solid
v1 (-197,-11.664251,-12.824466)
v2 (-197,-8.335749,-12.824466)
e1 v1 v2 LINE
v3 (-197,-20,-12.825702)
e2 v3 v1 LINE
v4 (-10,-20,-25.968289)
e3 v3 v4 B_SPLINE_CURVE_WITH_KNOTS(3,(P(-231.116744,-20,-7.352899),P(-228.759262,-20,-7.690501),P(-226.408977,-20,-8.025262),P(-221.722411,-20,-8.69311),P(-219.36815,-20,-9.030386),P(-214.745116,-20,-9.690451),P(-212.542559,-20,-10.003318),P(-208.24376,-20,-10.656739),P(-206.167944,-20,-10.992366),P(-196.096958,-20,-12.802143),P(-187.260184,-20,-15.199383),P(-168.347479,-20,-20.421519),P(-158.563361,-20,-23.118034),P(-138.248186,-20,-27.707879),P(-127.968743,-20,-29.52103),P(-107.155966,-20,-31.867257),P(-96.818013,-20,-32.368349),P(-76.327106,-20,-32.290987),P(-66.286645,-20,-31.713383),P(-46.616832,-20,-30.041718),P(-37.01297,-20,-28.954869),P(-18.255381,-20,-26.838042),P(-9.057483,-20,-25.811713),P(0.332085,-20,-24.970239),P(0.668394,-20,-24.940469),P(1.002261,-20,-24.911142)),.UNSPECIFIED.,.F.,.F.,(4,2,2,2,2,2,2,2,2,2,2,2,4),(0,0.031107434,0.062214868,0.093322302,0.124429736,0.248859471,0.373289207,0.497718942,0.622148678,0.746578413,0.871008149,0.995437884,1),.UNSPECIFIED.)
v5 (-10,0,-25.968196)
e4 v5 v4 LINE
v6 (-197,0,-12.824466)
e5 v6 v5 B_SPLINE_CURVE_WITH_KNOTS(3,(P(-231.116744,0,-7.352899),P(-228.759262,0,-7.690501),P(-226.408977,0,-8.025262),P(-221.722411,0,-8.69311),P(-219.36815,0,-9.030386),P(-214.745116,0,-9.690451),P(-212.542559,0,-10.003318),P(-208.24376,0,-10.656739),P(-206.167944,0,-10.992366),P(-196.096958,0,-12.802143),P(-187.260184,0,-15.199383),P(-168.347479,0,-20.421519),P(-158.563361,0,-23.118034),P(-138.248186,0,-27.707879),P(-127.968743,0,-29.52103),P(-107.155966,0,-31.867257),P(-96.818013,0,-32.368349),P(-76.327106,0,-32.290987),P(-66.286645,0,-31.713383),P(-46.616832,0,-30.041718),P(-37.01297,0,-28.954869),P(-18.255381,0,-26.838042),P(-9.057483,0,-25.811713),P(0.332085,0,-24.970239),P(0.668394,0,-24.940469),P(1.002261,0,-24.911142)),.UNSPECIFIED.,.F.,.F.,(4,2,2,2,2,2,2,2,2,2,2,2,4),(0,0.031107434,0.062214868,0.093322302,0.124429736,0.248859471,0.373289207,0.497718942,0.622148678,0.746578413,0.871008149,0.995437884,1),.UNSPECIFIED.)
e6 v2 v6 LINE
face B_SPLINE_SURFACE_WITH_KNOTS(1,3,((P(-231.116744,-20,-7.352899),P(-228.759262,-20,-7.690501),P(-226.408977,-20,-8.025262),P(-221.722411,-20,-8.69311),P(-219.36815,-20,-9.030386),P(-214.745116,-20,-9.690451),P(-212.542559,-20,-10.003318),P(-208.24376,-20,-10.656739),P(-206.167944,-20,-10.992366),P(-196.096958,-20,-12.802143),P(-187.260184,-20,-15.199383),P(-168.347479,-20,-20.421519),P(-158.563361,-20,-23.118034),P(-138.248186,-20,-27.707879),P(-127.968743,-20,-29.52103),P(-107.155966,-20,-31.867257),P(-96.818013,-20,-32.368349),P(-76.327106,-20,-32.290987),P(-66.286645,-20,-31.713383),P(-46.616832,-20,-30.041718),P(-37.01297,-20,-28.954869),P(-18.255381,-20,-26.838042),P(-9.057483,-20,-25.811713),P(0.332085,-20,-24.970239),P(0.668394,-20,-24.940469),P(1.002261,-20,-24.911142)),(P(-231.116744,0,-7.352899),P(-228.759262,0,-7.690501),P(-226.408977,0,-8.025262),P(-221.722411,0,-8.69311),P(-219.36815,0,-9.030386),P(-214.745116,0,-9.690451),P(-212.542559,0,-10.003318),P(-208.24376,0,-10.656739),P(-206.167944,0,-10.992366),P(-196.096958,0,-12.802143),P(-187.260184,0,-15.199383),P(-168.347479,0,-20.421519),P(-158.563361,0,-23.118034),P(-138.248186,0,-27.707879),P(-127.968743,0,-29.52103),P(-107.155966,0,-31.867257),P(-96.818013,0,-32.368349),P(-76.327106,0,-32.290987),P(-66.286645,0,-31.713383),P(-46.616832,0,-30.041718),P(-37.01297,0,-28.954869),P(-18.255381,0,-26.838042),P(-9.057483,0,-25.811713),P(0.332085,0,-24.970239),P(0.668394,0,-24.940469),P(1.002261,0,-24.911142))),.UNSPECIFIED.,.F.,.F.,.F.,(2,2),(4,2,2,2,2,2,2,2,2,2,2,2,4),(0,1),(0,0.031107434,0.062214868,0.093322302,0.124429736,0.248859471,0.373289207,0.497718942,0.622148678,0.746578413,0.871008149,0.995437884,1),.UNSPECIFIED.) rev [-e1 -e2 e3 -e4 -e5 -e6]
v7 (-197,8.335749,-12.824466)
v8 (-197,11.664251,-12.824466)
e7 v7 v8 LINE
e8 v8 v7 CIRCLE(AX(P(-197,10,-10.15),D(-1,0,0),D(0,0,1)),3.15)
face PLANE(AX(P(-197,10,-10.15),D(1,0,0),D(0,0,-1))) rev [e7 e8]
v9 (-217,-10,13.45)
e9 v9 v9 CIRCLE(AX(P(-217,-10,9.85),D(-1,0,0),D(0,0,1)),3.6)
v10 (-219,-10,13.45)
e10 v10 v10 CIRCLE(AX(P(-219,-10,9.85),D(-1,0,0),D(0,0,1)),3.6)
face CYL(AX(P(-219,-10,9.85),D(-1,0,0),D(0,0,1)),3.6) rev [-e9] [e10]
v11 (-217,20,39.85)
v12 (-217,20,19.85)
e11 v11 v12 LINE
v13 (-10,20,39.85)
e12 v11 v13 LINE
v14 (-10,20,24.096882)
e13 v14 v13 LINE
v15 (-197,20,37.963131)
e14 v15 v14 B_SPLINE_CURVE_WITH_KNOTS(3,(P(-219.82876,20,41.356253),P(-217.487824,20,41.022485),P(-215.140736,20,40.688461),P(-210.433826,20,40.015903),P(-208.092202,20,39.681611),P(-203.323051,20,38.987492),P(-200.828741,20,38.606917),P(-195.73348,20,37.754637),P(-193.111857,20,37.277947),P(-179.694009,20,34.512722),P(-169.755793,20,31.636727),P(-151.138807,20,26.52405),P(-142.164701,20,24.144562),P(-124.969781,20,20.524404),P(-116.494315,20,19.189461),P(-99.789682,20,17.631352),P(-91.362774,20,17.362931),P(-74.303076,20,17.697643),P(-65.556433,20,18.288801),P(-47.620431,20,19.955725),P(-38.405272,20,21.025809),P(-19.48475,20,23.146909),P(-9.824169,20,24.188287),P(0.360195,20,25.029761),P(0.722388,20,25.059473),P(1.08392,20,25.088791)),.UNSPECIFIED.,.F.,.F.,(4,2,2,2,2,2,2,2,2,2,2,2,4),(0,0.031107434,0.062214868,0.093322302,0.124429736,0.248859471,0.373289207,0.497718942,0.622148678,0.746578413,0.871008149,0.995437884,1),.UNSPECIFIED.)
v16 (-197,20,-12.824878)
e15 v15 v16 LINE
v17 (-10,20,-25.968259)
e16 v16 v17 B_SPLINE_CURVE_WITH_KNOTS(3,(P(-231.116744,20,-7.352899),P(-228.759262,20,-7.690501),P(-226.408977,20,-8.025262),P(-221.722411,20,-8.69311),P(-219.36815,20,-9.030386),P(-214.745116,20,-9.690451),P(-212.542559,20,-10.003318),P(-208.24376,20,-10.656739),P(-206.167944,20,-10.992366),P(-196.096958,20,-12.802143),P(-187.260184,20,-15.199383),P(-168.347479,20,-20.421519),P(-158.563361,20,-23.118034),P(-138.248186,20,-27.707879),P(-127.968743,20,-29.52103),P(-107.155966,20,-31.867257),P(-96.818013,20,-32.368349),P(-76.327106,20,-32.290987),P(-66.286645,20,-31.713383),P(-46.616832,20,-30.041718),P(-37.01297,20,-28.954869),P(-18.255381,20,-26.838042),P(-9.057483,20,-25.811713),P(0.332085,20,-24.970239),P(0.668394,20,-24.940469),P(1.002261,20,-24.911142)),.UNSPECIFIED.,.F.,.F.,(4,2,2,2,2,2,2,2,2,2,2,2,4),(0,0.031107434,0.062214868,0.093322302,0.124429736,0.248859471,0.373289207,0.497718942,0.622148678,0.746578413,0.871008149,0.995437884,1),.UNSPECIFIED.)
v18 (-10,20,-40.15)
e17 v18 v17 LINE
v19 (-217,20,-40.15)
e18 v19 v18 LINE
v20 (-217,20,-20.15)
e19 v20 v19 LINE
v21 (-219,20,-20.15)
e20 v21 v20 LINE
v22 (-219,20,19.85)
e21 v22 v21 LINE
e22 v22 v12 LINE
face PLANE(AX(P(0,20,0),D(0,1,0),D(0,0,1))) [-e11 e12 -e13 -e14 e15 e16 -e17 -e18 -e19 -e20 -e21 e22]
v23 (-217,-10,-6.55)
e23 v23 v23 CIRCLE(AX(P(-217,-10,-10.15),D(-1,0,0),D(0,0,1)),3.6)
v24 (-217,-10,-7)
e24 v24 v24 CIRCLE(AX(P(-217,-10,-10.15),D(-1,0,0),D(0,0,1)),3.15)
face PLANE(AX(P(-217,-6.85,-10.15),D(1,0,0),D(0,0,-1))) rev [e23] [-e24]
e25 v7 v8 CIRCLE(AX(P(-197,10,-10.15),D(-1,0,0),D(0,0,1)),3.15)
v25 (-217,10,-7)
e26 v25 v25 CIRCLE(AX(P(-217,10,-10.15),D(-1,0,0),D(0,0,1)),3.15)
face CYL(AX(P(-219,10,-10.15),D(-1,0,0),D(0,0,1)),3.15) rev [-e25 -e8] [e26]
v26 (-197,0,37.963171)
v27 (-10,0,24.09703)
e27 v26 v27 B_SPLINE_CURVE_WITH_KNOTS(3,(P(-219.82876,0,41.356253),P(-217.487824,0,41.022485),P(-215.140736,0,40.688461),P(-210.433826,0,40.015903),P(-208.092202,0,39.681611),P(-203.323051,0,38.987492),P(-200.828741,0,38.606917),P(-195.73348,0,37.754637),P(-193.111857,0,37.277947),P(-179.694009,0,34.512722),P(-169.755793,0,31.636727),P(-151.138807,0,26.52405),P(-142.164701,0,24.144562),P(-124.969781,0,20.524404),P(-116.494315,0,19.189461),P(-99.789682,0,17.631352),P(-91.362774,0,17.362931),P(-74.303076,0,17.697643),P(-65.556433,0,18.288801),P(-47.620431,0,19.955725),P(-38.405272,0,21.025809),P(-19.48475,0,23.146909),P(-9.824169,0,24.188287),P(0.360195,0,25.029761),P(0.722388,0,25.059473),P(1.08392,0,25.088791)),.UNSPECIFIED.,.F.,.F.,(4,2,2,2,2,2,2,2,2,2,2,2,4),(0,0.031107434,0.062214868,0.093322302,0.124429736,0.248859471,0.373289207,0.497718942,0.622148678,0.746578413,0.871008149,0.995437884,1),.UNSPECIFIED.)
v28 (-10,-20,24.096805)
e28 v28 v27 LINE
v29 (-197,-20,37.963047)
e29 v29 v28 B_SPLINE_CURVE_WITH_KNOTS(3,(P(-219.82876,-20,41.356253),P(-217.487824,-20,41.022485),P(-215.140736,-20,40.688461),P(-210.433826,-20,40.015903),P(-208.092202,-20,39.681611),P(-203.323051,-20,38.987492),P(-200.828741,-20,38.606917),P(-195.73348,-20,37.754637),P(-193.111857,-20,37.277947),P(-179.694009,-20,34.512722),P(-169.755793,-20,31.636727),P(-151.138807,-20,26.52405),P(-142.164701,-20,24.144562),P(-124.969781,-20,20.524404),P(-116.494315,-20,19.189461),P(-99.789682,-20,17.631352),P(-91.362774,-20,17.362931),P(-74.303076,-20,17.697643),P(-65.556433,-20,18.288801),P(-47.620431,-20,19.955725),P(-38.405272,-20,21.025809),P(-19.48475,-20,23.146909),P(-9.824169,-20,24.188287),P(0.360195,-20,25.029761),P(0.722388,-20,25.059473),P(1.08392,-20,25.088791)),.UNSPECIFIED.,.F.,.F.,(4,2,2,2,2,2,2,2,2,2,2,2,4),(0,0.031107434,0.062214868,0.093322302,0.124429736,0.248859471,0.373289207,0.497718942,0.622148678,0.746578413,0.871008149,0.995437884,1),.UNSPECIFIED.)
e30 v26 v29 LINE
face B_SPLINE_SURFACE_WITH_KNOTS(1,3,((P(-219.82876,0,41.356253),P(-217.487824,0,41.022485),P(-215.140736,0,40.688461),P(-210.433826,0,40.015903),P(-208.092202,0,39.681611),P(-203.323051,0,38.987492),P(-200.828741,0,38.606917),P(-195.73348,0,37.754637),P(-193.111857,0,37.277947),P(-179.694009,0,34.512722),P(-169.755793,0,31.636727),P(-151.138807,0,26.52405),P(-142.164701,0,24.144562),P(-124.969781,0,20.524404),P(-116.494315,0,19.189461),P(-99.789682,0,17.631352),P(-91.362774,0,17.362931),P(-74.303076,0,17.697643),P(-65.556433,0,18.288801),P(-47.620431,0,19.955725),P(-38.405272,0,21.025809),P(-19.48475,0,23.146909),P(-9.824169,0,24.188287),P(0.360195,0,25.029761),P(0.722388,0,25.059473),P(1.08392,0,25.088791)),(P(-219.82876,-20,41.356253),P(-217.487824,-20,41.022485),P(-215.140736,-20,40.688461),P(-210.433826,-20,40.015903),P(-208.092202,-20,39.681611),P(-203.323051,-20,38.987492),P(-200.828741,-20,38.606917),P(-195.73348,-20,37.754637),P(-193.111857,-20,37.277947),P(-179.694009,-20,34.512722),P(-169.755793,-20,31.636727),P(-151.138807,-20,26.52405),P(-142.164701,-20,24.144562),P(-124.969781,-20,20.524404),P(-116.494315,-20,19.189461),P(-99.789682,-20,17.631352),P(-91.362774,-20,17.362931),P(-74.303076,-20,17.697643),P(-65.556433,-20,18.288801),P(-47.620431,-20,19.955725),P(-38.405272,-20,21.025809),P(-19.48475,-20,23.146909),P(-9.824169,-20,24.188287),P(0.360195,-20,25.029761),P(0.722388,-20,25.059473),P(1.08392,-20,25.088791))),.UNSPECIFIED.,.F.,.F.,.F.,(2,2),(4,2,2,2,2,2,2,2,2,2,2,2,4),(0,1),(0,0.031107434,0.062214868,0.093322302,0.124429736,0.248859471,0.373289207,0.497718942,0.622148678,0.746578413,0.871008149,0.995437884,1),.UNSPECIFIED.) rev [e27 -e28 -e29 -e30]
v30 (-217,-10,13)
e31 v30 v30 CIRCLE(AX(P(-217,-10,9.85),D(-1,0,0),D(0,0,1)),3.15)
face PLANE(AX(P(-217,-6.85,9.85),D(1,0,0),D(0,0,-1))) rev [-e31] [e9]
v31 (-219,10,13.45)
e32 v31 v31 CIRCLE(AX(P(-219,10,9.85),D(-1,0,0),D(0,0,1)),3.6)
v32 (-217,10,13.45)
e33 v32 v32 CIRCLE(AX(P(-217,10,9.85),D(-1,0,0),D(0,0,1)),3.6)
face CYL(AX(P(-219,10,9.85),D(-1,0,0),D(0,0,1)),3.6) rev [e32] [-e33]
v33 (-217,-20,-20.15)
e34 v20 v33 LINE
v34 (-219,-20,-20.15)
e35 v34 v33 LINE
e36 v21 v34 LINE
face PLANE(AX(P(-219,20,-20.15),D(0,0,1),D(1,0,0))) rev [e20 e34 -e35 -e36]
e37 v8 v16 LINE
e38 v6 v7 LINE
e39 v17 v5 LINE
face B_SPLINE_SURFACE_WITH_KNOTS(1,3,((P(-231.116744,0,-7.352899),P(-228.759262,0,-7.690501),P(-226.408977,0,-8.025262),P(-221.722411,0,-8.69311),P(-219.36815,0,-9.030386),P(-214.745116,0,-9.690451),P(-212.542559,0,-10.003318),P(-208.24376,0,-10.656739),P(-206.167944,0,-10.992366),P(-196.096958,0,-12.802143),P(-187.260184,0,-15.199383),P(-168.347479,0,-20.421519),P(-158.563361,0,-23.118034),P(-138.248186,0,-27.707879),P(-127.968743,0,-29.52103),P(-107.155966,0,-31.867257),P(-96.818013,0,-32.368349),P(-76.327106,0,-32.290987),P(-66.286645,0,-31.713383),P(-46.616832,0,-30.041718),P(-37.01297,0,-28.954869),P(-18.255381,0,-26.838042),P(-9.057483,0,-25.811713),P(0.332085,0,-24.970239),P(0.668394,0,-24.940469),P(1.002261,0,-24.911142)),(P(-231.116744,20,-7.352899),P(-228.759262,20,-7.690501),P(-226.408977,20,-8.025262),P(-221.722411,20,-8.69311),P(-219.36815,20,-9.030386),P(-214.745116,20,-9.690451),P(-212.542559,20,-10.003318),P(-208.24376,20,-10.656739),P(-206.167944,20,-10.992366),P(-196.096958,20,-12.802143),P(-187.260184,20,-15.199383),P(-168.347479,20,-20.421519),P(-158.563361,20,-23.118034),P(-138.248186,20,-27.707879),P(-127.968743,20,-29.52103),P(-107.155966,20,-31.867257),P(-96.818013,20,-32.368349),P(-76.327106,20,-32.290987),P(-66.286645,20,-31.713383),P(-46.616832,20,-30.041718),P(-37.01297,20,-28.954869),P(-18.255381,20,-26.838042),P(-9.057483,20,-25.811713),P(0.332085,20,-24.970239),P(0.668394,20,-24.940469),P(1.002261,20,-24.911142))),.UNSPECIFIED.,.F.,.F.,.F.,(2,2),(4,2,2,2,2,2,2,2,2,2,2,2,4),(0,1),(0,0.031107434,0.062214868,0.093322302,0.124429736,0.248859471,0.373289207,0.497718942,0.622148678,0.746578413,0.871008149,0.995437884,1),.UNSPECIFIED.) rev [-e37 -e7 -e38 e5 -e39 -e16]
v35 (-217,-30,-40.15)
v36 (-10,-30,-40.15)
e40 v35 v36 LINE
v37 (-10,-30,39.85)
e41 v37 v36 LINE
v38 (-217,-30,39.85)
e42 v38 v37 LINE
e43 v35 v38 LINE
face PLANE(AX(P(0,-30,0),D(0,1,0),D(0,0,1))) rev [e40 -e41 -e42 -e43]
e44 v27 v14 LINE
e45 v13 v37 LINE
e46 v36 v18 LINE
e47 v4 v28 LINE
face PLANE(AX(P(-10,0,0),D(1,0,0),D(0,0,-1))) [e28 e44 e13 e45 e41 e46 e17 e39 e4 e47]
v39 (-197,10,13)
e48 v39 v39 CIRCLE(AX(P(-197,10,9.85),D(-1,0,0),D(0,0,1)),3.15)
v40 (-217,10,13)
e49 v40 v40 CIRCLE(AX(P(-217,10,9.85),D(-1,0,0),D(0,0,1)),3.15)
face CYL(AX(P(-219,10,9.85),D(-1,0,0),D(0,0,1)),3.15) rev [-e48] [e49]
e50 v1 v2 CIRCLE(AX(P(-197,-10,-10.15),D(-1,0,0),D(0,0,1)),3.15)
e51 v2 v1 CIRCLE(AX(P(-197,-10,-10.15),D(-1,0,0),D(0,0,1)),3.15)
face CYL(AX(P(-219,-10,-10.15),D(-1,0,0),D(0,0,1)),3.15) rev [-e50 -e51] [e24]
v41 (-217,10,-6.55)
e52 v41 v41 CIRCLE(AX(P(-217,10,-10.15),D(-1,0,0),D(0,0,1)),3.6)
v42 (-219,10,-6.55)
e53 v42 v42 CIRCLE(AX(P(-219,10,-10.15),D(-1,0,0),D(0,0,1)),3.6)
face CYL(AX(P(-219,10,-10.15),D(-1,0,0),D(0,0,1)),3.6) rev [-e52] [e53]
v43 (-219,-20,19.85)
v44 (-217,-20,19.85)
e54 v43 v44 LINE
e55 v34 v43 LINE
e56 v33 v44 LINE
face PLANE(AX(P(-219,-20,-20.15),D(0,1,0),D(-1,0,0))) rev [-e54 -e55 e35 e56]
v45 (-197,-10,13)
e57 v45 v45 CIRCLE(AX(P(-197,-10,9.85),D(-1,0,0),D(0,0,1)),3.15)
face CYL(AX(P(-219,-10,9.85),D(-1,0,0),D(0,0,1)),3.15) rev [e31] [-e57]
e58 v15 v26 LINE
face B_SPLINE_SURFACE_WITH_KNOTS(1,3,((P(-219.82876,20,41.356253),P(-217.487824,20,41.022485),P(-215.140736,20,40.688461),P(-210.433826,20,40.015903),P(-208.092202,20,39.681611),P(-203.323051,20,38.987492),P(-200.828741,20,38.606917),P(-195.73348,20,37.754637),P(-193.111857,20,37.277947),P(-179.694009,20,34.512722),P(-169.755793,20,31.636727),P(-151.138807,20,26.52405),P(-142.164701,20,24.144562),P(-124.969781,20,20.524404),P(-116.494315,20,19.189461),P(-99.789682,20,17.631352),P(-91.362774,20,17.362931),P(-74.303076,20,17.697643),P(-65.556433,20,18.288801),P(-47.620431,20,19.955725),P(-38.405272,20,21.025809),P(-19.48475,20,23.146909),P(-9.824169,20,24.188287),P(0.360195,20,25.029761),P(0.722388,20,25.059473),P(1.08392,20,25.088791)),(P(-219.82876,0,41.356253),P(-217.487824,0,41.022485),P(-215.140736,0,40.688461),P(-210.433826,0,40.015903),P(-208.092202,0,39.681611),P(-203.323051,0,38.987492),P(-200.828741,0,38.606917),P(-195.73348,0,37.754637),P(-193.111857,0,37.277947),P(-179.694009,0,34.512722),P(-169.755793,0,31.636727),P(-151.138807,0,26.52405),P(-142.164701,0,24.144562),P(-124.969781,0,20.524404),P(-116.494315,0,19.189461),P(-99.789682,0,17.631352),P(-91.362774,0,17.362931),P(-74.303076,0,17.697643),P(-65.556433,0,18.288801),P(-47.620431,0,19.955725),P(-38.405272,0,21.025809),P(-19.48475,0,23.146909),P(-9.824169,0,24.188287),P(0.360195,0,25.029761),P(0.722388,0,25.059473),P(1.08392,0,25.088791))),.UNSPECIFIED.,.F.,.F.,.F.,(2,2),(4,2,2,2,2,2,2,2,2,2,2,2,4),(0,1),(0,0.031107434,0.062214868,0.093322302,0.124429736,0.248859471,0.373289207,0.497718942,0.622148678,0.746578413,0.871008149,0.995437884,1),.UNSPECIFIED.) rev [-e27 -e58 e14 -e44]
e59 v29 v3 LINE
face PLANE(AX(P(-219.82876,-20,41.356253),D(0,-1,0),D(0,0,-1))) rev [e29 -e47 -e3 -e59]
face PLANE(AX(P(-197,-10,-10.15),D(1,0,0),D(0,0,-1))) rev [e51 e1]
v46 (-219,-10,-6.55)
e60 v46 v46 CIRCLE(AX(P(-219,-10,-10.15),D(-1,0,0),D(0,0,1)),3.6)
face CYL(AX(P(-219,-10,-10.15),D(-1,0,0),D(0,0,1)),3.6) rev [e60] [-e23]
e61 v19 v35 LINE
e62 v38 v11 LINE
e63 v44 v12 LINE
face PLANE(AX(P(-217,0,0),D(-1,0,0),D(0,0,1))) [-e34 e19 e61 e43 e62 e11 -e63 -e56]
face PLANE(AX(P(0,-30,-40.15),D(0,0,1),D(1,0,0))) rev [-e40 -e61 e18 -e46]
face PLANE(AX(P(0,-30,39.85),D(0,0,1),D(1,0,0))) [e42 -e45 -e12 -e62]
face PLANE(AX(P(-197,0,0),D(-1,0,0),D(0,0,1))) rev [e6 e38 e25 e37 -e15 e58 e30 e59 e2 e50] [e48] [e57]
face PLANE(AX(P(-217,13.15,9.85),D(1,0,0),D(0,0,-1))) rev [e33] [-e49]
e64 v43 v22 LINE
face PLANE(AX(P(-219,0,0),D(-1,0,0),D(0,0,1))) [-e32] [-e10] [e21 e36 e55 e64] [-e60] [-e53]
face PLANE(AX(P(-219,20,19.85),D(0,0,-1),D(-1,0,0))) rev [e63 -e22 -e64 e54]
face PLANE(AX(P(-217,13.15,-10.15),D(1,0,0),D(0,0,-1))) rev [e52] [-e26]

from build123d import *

# Parameters (mm, degrees)
BOSS_EXTRUDE1_DEPTH      = 20
BOSS_EXTRUDE1_DEPTH_BACK = 30
CUT_SWEEP1_START         = -20
CUT_SWEEP1_DEPTH         = 40
SKETCH10_W               = 80
SKETCH10_H               = 50
BOSS_EXTRUDE2_DEPTH      = 20
SKETCH16_W               = 40
SKETCH16_H               = 40
BOSS_EXTRUDE3_DEPTH      = 2
HOLE2_D                  = 6.3
HOLE2_DEPTH              = 22
HOLE2_CBORE_D            = 7.2
HOLE2_CBORE_DEPTH        = 2
SKETCH21_W               = 80
SKETCH21_H               = 50
CUT_EXTRUDE1_DEPTH       = 10


# Read off the part's stored shape, not the designer's step: Cut-Sweep1
with BuildPart() as part:
    # Sketch4 → Boss-Extrude1 (new, two sides: drawn at the far end of the back side and taken through both)
    with BuildSketch(Plane(origin=(0, 0, 0), x_dir=(1, 0, 0), z_dir=(0, 1, 0)).offset(-BOSS_EXTRUDE1_DEPTH_BACK)):
        with BuildLine():
            Line((0, 40.15), (-197, 40.15))
            Line((-197, 40.15), (-197, -12.476031535))
            add(Edge.make_bspline(
                [(-197, -12.476031535), (-157.6, -4.723053252), (-118.2, 15.300441144), (-78.8, 10.012115501), (-39.4, 3.538400001), (0, 0.15)],
                knots=[0.083275556, 0.083275556, 0.083275556, 0.083275556, 0.083275556, 0.083275556, 0.916661414, 0.916661414, 0.916661414, 0.916661414, 0.916661414, 0.916661414], degree=5))
            Line((0, 0.15), (0, 40.15))
        make_face()
        with BuildLine():
            add(Edge.make_bspline(
                [(-197, -12.476031535), (-157.6, -4.723053252), (-118.2, 15.300441144), (-78.8, 10.012115501), (-39.4, 3.538400001), (0, 0.15)],
                knots=[0.083275556, 0.083275556, 0.083275556, 0.083275556, 0.083275556, 0.083275556, 0.916661414, 0.916661414, 0.916661414, 0.916661414, 0.916661414, 0.916661414], degree=5))
            Line((-197, -12.476031535), (-197, -39.85))
            Line((-197, -39.85), (0, -39.85))
            Line((0, -39.85), (0, 0.15))
        make_face()
    extrude(amount=BOSS_EXTRUDE1_DEPTH + BOSS_EXTRUDE1_DEPTH_BACK)

    # Cut-Sweep1 outline → Cut-Sweep1 (cut)
    with BuildSketch(Plane(origin=(0, 0, 0), x_dir=(1, 0, 0), z_dir=(0, 1, 0)).offset(CUT_SWEEP1_START)):
        with BuildLine():
            Line((-197, 12.824466259), (-197, -37.963170516))
            add(Edge.make_bspline(
                [(-197, -37.963170516), (-194.857076562, -37.593469155), (-192.664183232, -37.185688204), (-179.694008515, -34.512721603), (-169.755793181, -31.636726837), (-151.13880736, -26.524050167), (-142.164701345, -24.14456221), (-124.9697813, -20.524403523), (-116.494315107, -19.189461235), (-99.789682062, -17.631352392), (-91.362774073, -17.362930945), (-74.303075644, -17.69764349), (-65.556432968, -18.288800586), (-47.620430646, -19.955725203), (-38.405272349, -21.025808689), (-19.484749512, -23.146908776), (-9.824169485, -24.188286581), (0, -25)],
                knots=[0.098511652, 0.098511652, 0.098511652, 0.098511652, 0.124429736, 0.124429736, 0.248859471, 0.248859471, 0.373289207, 0.373289207, 0.497718942, 0.497718942, 0.622148678, 0.622148678, 0.746578413, 0.746578413, 0.871008149, 0.871008149, 0.995437884, 0.995437884, 0.995437884, 0.995437884], degree=3))
            Line((0, -25), (0, 25))
            add(Edge.make_bspline(
                [(-197, 12.824466259), (-190.953867766, 14.201157707), (-184.535853215, 15.951619244), (-168.3474788, 20.421519224), (-158.563360814, 23.118034358), (-138.248185708, 27.707878723), (-127.968743149, 29.521030359), (-107.155965698, 31.867257342), (-96.8180132, 32.368349134), (-76.327105621, 32.290986848), (-66.286644699, 31.713382561), (-46.616831507, 30.041717947), (-37.012970151, 28.954868939), (-18.255380676, 26.838041894), (-9.05748306, 25.811713394), (0, 25)],
                knots=[0.160277357, 0.160277357, 0.160277357, 0.160277357, 0.248859471, 0.248859471, 0.373289207, 0.373289207, 0.497718942, 0.497718942, 0.622148678, 0.622148678, 0.746578413, 0.746578413, 0.871008149, 0.871008149, 0.995437884, 0.995437884, 0.995437884, 0.995437884], degree=3))
        make_face()
    extrude(amount=CUT_SWEEP1_DEPTH, mode=Mode.SUBTRACT)

    # Sketch10 → Boss-Extrude2 (add)
    with BuildSketch(Plane.ZY.offset(197)):
        with Locations((-0.15, -5)):
            Rectangle(SKETCH10_W, SKETCH10_H)
    extrude(amount=BOSS_EXTRUDE2_DEPTH)

    # Sketch16 → Boss-Extrude3 (add)
    with BuildSketch(Plane.ZY.offset(217)):
        with Locations((-0.15, 0)):
            Rectangle(SKETCH16_W, SKETCH16_H)
    extrude(amount=BOSS_EXTRUDE3_DEPTH)

    # Hole2
    with Locations(Plane.ZY.offset(219)):
        with Locations((-10.15, 10), (9.85, 10), (-10.15, -10), (9.85, -10)):
            CounterBoreHole(HOLE2_D / 2, HOLE2_CBORE_D / 2, HOLE2_CBORE_DEPTH, depth=HOLE2_DEPTH)

    # Sketch21 → Cut-Extrude1 (cut)
    with BuildSketch(Plane(origin=(0, 0, 0), x_dir=(0, 0, -1), z_dir=(1, 0, 0))):
        with Locations((0.15, -5)):
            Rectangle(SKETCH21_W, SKETCH21_H)
    extrude(amount=-CUT_EXTRUDE1_DEPTH, mode=Mode.SUBTRACT)


solid = part.part
